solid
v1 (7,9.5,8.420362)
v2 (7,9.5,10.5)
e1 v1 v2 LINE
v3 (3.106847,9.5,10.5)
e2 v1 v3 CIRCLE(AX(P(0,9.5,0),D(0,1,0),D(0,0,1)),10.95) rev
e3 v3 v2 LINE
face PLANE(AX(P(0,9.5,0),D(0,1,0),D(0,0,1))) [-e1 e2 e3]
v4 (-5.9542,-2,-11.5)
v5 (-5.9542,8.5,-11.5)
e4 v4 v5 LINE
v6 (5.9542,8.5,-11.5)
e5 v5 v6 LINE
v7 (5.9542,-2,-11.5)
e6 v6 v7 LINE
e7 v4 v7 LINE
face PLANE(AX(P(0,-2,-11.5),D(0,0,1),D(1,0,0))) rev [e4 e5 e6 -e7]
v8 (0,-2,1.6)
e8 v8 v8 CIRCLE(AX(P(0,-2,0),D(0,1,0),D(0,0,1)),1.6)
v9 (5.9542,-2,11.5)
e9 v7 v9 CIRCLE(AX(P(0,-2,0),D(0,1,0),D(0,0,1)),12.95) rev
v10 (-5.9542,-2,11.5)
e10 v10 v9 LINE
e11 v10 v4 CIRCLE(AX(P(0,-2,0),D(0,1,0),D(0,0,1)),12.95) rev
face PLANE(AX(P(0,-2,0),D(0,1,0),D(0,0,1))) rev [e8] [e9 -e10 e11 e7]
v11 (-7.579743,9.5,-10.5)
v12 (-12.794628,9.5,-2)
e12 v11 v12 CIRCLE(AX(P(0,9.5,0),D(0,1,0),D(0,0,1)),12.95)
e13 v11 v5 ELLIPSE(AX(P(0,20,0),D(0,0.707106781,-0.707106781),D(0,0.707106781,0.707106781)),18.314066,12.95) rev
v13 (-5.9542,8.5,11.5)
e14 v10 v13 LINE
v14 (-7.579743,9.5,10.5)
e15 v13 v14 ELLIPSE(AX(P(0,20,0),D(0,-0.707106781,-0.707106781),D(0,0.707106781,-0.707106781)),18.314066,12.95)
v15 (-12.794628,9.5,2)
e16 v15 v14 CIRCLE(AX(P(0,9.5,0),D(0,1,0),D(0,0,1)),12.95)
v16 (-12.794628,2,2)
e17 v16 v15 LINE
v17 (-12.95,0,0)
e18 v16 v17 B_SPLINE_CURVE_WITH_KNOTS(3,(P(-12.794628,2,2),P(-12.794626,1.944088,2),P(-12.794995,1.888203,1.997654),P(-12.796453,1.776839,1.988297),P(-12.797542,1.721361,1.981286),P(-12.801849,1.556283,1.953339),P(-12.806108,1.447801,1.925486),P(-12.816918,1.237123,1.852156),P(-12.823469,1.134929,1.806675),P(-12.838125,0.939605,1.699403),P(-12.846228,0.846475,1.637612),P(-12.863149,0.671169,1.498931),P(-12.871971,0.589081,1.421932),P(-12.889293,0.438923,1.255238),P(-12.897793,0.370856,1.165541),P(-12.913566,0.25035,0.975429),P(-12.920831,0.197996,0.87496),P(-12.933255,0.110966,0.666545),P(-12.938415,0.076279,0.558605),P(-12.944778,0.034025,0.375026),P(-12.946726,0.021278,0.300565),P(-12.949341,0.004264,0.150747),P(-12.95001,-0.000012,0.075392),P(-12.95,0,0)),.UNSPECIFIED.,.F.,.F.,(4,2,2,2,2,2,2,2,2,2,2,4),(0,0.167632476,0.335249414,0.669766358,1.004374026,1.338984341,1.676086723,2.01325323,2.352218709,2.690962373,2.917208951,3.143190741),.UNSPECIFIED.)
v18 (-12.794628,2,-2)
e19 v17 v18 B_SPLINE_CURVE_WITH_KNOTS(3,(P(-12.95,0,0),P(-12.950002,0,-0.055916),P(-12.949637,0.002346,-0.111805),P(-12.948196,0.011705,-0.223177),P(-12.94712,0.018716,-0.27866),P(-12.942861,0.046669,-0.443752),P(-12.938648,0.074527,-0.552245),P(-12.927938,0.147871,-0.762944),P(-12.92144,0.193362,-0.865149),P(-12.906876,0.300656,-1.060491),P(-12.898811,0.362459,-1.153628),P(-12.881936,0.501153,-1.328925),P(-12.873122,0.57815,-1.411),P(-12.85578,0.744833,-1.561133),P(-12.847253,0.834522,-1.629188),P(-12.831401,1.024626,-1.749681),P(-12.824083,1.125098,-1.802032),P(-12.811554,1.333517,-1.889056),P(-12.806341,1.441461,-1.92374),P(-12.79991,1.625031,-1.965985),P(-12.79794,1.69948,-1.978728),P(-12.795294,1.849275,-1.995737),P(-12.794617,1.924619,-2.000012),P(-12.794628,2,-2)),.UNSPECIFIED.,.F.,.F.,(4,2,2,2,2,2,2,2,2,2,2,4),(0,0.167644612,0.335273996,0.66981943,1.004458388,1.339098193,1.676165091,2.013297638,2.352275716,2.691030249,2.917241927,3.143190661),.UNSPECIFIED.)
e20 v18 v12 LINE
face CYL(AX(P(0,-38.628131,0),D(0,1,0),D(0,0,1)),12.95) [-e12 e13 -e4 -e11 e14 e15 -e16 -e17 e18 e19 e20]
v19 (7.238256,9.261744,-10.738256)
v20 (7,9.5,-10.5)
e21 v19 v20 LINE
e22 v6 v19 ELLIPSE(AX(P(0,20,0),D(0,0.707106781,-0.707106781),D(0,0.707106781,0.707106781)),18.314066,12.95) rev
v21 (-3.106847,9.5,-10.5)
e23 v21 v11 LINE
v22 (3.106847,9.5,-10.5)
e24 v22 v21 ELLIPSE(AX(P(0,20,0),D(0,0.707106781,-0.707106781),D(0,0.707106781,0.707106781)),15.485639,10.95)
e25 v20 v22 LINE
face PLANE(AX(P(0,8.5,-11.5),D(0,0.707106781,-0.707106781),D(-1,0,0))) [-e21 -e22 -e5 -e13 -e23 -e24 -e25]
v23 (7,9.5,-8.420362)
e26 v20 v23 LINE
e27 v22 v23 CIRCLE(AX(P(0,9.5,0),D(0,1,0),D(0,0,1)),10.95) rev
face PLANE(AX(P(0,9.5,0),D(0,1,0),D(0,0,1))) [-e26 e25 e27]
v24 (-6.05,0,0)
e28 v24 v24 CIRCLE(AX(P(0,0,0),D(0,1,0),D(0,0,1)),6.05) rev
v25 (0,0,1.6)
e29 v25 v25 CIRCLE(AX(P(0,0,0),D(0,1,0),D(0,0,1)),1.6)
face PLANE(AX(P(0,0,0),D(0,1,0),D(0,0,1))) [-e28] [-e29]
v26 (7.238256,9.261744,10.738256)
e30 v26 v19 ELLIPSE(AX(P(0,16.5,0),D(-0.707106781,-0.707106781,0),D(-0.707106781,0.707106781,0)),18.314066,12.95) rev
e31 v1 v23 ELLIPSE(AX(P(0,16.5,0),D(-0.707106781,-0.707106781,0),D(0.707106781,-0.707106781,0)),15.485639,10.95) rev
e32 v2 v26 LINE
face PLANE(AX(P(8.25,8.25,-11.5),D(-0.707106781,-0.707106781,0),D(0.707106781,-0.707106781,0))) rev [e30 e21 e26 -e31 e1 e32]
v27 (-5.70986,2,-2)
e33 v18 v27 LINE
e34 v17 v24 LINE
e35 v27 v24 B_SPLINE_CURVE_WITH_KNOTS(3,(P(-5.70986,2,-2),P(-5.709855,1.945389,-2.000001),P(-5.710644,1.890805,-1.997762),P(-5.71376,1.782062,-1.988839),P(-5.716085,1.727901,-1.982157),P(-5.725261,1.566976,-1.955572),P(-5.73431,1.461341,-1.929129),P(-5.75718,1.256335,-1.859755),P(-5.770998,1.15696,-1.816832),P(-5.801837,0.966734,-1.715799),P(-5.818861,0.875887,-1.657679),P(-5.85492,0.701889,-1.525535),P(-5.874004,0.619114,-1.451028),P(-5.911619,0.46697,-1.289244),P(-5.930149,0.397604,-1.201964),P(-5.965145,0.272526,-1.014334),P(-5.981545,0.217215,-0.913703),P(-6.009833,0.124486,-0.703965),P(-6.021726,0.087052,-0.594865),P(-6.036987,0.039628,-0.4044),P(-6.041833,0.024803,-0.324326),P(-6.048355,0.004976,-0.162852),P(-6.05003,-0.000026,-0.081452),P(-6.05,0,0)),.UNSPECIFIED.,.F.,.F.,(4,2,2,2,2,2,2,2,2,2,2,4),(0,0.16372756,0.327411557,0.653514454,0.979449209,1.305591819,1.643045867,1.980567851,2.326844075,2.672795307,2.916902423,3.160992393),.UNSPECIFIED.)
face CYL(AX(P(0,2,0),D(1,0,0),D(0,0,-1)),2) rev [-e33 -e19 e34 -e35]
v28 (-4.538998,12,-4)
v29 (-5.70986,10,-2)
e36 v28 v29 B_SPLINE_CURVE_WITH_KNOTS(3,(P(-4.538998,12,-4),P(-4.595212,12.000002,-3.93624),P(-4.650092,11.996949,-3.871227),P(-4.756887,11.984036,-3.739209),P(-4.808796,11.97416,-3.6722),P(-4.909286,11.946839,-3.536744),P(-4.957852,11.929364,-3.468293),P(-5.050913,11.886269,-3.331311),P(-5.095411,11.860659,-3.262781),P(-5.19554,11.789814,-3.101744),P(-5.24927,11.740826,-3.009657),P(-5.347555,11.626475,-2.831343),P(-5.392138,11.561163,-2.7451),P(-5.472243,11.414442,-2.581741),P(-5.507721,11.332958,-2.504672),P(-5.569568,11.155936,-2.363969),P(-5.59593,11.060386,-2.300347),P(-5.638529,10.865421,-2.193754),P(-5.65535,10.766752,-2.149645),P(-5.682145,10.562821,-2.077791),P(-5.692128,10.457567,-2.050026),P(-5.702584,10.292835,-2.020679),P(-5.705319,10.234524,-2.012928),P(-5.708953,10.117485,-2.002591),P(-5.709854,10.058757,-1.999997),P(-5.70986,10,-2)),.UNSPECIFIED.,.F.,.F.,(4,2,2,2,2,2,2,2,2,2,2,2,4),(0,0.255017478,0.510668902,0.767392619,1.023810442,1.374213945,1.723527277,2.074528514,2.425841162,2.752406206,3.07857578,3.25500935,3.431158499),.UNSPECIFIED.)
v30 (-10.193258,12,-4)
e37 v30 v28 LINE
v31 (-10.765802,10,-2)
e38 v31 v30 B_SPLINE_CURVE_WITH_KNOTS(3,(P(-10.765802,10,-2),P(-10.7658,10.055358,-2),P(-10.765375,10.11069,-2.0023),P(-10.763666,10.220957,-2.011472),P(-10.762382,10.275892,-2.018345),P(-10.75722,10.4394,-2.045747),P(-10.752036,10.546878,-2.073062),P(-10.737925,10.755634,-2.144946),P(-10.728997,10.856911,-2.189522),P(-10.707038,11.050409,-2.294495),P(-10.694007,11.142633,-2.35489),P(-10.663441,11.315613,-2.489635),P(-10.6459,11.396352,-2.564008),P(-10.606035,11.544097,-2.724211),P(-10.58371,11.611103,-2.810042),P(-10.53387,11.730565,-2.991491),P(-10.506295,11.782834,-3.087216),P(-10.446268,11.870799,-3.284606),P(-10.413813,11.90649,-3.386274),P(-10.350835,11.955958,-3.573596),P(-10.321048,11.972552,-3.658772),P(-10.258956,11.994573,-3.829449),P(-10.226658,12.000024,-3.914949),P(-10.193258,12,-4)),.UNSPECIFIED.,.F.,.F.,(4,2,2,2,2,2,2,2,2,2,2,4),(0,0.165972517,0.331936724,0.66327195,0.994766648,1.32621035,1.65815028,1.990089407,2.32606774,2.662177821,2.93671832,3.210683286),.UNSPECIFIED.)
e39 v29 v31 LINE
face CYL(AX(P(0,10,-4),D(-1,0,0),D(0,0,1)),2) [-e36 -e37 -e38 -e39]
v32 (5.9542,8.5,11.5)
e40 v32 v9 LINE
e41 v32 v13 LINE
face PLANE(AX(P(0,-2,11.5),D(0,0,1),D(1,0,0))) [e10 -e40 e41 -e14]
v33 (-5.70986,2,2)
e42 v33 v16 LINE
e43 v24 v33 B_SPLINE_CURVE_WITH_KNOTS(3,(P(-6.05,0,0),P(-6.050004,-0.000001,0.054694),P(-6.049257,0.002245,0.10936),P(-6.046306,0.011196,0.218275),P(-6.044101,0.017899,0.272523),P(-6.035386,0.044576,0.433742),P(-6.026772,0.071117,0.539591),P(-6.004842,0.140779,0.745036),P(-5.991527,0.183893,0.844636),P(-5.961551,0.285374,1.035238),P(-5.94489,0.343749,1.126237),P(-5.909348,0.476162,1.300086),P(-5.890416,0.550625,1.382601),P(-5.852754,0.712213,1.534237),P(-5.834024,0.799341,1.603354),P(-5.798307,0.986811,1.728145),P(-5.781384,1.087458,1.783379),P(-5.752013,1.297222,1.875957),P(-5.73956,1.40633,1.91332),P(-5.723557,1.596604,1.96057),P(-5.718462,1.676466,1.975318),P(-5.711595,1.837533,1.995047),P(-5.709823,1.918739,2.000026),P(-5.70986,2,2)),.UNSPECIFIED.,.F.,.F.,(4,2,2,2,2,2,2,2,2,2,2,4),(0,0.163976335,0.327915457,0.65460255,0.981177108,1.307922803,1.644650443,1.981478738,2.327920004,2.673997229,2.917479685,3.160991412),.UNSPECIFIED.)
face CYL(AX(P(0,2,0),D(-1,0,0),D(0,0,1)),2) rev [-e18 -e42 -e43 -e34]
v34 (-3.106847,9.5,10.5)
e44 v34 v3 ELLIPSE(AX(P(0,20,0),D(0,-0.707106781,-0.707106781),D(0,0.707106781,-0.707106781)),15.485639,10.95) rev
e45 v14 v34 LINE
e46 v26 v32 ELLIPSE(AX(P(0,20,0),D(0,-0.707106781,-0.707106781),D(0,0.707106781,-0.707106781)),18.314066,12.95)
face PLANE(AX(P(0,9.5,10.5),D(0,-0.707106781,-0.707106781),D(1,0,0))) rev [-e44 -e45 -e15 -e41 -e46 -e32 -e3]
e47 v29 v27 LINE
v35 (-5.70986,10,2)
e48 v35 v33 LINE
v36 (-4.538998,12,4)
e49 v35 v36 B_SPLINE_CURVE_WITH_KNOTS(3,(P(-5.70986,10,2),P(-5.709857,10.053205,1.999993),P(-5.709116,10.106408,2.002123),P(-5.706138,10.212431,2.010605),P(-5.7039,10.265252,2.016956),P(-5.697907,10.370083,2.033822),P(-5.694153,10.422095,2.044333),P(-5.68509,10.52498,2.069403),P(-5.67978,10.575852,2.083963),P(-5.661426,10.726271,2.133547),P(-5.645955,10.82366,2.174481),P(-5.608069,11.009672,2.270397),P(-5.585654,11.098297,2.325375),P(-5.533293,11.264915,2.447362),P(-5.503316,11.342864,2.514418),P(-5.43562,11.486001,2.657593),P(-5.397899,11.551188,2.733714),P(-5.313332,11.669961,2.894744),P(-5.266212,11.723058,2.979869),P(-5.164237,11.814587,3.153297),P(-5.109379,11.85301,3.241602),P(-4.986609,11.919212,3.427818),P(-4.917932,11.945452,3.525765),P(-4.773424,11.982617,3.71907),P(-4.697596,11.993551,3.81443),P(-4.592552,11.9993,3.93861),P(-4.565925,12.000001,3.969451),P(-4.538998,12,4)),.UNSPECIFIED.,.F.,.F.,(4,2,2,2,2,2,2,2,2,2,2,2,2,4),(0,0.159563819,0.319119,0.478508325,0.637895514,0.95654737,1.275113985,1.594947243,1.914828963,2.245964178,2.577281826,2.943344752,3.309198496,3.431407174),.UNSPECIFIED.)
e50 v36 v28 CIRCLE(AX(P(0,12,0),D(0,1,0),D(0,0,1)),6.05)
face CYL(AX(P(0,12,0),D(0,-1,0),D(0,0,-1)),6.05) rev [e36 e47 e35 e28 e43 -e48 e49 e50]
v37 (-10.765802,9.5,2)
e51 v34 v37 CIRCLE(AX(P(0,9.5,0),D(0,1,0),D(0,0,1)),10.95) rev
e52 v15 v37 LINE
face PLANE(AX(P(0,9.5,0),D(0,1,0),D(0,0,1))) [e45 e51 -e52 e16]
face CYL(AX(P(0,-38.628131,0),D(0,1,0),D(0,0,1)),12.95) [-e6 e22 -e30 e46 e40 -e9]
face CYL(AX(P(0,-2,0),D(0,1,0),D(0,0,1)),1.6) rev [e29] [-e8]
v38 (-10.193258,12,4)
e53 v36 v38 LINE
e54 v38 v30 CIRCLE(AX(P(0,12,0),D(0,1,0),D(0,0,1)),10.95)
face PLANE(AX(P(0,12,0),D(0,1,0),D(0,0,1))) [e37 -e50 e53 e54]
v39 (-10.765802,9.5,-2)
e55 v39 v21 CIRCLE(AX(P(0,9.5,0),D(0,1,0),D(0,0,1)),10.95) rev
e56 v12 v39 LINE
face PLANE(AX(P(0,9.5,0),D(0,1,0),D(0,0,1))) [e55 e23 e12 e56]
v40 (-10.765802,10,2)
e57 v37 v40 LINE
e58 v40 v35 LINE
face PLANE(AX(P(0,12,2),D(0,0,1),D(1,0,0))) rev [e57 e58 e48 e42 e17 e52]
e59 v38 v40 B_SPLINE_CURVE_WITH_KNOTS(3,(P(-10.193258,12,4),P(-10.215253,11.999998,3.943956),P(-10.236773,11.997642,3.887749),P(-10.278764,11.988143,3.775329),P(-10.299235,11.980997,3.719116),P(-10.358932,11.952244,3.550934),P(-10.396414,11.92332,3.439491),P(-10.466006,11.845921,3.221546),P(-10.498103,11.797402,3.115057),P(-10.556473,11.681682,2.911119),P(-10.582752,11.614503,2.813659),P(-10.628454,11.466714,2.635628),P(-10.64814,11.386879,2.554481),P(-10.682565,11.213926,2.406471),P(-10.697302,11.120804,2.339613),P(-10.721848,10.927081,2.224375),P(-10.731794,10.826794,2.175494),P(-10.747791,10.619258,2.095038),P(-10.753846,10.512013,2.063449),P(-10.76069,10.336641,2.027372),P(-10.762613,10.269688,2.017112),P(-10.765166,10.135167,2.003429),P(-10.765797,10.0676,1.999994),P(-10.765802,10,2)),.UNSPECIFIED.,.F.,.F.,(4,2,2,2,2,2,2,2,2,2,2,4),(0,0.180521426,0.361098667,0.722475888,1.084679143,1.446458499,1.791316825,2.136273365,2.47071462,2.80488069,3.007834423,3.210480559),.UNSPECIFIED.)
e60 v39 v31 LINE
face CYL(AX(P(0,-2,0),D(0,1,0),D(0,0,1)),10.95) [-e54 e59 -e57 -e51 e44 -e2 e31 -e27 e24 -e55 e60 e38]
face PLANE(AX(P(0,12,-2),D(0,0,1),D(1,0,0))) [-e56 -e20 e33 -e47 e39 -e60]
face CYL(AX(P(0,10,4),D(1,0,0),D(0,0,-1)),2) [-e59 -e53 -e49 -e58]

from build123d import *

# Parameters (mm, degrees)
SKETCH1_R               = 10.95
SKETCH1_R_2             = 6.05
BOSS_EXTRUDE1_DEPTH     = 2
BOSS_EXTRUDE2_START     = 12
SKETCH1_3_R             = 10.95
SKETCH1_3_R_2           = 6.05
BOSS_EXTRUDE2_DEPTH     = 12
BOSS_EXTRUDE3_START     = -2.5
SKETCH2_R               = 12.95
SKETCH2_R_2             = 10.95
BOSS_EXTRUDE3_DEPTH     = 11.5
CUT_EXTRUDE1_DEPTH      = 22.895319134
CUT_EXTRUDE1_DEPTH_BACK = 22.895319134
SKETCH3_W               = 100
SKETCH3_H               = 23
CUT_EXTRUDE3_DEPTH      = 22.07018035
CUT_EXTRUDE3_DEPTH_BACK = 22.07018035
BOSS_EXTRUDE4_START     = 12
SKETCH1_5_R             = 10.95
SKETCH1_5_R_2           = 6.05
BOSS_EXTRUDE4_DEPTH     = 12
SKETCH5_W               = 18
SKETCH5_H               = 4
CUT_EXTRUDE4_DEPTH      = 22.07018035
FILLET1_R               = 2
CUT_EXTRUDE5_DEPTH      = 22.070180523
CUT_EXTRUDE5_DEPTH_BACK = 22.070180523
SKETCH6_R               = 1.6
CHAMFER1_SIZE           = 1


# Some blends are built 0.0001 mm under size
with BuildPart() as part:
    # Sketch1 → Boss-Extrude1 (new body)
    # profile 1 of 2: a face of its own
    with BuildSketch(Plane(origin=(0, 0, 0), x_dir=(1, 0, 0), z_dir=(0, 1, 0))):
        with Locations(Location((0, 0, 0), (0, 0, 270))):
            Circle(SKETCH1_R)
        Circle(SKETCH1_R_2, mode=Mode.SUBTRACT)
    # profile 2 of 2: a face of its own
    with BuildSketch(Plane(origin=(0, 0, 0), x_dir=(1, 0, 0), z_dir=(0, 1, 0))):
        Circle(SKETCH1_R_2)
    extrude(amount=-BOSS_EXTRUDE1_DEPTH)

    # Sketch1<3> → Boss-Extrude2 (add)
    with BuildSketch(Plane(origin=(0, 0, 0), x_dir=(1, 0, 0), z_dir=(0, 1, 0)).offset(BOSS_EXTRUDE2_START)):
        with Locations(Location((0, 0, 0), (0, 0, 270))):
            Circle(SKETCH1_3_R)
        with Locations(Location((0, 0, 0), (0, 0, 270))):
            Circle(SKETCH1_3_R_2, mode=Mode.SUBTRACT)
    extrude(amount=-BOSS_EXTRUDE2_DEPTH)

    # Sketch2 → Boss-Extrude3 (add)
    with BuildSketch(Plane(origin=(0, 12, 0), x_dir=(1, 0, 0), z_dir=(0, 1, 0)).offset(BOSS_EXTRUDE3_START)):
        with Locations(Location((0, 0, 0), (0, 0, 270))):
            Circle(SKETCH2_R)
        with Locations(Location((0, 0, 0), (0, 0, 270))):
            Circle(SKETCH2_R_2, mode=Mode.SUBTRACT)
    extrude(amount=-BOSS_EXTRUDE3_DEPTH)

    # Sketch3 → Cut-Extrude1 (cut, two sides: drawn at the far end of the back side and taken through both)
    with BuildSketch(Plane(origin=(0, 0, 0), x_dir=(1, 0, 0), z_dir=(0, 1, 0)).offset(-CUT_EXTRUDE1_DEPTH_BACK)):
        with Locations((0, -23)):
            Rectangle(SKETCH3_W, SKETCH3_H)
        with Locations((0, 23)):
            Rectangle(SKETCH3_W, SKETCH3_H)
    extrude(amount=CUT_EXTRUDE1_DEPTH + CUT_EXTRUDE1_DEPTH_BACK, mode=Mode.SUBTRACT)

    # Sketch4 → Cut-Extrude3 (cut, two sides: drawn at the far end of the back side and taken through both)
    with BuildSketch(Plane.XY.offset(-CUT_EXTRUDE3_DEPTH_BACK)):
        Polygon((13, 12), (4.5, 12), (13, 3.5), align=None)
    extrude(amount=CUT_EXTRUDE3_DEPTH + CUT_EXTRUDE3_DEPTH_BACK, mode=Mode.SUBTRACT)

    # Sketch1<5> → Boss-Extrude4 (add)
    with BuildSketch(Plane(origin=(0, 0, 0), x_dir=(1, 0, 0), z_dir=(0, 1, 0)).offset(BOSS_EXTRUDE4_START)):
        with Locations(Location((0, 0, 0), (0, 0, 270))):
            Circle(SKETCH1_5_R)
        with Locations(Location((0, 0, 0), (0, 0, 270))):
            Circle(SKETCH1_5_R_2, mode=Mode.SUBTRACT)
    extrude(amount=-BOSS_EXTRUDE4_DEPTH)

    # Sketch5 → Cut-Extrude4 (cut, through all)
    with BuildSketch(Plane(origin=(0, 0, 0), x_dir=(1, 0, 0), z_dir=(0, 1, 0))):
        with Locations((-11, 0)):
            Rectangle(SKETCH5_W, SKETCH5_H)
    extrude(amount=CUT_EXTRUDE4_DEPTH, mode=Mode.SUBTRACT)

    # Fillet1
    fillet1_edges = [part.edges().sort_by_distance(p)[0] for p in [
        (-8.237831116, 12, 2),
        (-8.237831116, 12, -2),
        (-9.252243836, 0, -2),
        (-9.252243836, 0, 2),
    ]]
    fillet(fillet1_edges, radius=FILLET1_R - 0.0001)  # a hair under: the kernel refuses the full size

    # Sketch6 → Cut-Extrude5 (cut, two sides: drawn at the far end of the back side and taken through both)
    with BuildSketch(Plane(origin=(0, 0, 0), x_dir=(1, 0, 0), z_dir=(0, 1, 0)).offset(-CUT_EXTRUDE5_DEPTH_BACK)):
        with Locations(Location((0, 0, 0), (0, 0, 270))):
            Circle(SKETCH6_R)
    extrude(amount=CUT_EXTRUDE5_DEPTH + CUT_EXTRUDE5_DEPTH_BACK, mode=Mode.SUBTRACT)

    # Chamfer1
    # the kernel refuses this chamfer: 1 mm, written as the material it takes off along each edge
    with BuildSketch(Plane(origin=(8.525883186, 9.5, 11.5), x_dir=(0, 0.027495876610585647, -0.9996219169112968), z_dir=(-1, 0, 0))) as chamfer1_piece_1_section:
        Polygon((CHAMFER1_SIZE * 0.999621916911, CHAMFER1_SIZE * 0.0274958766106), (-CHAMFER1_SIZE * 0.0274958766106, CHAMFER1_SIZE * 0.999621916911), (0, 0), align=None)
    chamfer1_piece_1 = extrude(amount=17.051766372, mode=Mode.PRIVATE)
    chamfer1_piece_1 = chamfer1_piece_1 - Plane(origin=(0, 9.159933663, 0), x_dir=(0, 0, 1), z_dir=(0, 1, 0)) * Cylinder(10.95, 39, mode=Mode.PRIVATE)
    add(chamfer1_piece_1, mode=Mode.SUBTRACT)
    with BuildSketch(Plane(origin=(8.525883186, 9.5, -11.5), x_dir=(0, 0.027495876610585647, 0.9996219169112968), z_dir=(-1, 0, 0))) as chamfer1_piece_2_section:
        Polygon((CHAMFER1_SIZE * 0.999621916911, -CHAMFER1_SIZE * 0.0274958766106), (-CHAMFER1_SIZE * 0.0274958766106, -CHAMFER1_SIZE * 0.999621916911), (0, 0), align=None)
    chamfer1_piece_2 = extrude(amount=17.051766372, mode=Mode.PRIVATE)
    chamfer1_piece_2 = chamfer1_piece_2 - Plane(origin=(0, 9.159933662, 0), x_dir=(0, 0, 1), z_dir=(0, 1, 0)) * Cylinder(10.95, 39, mode=Mode.PRIVATE)
    add(chamfer1_piece_2, mode=Mode.SUBTRACT)


solid = part.part
